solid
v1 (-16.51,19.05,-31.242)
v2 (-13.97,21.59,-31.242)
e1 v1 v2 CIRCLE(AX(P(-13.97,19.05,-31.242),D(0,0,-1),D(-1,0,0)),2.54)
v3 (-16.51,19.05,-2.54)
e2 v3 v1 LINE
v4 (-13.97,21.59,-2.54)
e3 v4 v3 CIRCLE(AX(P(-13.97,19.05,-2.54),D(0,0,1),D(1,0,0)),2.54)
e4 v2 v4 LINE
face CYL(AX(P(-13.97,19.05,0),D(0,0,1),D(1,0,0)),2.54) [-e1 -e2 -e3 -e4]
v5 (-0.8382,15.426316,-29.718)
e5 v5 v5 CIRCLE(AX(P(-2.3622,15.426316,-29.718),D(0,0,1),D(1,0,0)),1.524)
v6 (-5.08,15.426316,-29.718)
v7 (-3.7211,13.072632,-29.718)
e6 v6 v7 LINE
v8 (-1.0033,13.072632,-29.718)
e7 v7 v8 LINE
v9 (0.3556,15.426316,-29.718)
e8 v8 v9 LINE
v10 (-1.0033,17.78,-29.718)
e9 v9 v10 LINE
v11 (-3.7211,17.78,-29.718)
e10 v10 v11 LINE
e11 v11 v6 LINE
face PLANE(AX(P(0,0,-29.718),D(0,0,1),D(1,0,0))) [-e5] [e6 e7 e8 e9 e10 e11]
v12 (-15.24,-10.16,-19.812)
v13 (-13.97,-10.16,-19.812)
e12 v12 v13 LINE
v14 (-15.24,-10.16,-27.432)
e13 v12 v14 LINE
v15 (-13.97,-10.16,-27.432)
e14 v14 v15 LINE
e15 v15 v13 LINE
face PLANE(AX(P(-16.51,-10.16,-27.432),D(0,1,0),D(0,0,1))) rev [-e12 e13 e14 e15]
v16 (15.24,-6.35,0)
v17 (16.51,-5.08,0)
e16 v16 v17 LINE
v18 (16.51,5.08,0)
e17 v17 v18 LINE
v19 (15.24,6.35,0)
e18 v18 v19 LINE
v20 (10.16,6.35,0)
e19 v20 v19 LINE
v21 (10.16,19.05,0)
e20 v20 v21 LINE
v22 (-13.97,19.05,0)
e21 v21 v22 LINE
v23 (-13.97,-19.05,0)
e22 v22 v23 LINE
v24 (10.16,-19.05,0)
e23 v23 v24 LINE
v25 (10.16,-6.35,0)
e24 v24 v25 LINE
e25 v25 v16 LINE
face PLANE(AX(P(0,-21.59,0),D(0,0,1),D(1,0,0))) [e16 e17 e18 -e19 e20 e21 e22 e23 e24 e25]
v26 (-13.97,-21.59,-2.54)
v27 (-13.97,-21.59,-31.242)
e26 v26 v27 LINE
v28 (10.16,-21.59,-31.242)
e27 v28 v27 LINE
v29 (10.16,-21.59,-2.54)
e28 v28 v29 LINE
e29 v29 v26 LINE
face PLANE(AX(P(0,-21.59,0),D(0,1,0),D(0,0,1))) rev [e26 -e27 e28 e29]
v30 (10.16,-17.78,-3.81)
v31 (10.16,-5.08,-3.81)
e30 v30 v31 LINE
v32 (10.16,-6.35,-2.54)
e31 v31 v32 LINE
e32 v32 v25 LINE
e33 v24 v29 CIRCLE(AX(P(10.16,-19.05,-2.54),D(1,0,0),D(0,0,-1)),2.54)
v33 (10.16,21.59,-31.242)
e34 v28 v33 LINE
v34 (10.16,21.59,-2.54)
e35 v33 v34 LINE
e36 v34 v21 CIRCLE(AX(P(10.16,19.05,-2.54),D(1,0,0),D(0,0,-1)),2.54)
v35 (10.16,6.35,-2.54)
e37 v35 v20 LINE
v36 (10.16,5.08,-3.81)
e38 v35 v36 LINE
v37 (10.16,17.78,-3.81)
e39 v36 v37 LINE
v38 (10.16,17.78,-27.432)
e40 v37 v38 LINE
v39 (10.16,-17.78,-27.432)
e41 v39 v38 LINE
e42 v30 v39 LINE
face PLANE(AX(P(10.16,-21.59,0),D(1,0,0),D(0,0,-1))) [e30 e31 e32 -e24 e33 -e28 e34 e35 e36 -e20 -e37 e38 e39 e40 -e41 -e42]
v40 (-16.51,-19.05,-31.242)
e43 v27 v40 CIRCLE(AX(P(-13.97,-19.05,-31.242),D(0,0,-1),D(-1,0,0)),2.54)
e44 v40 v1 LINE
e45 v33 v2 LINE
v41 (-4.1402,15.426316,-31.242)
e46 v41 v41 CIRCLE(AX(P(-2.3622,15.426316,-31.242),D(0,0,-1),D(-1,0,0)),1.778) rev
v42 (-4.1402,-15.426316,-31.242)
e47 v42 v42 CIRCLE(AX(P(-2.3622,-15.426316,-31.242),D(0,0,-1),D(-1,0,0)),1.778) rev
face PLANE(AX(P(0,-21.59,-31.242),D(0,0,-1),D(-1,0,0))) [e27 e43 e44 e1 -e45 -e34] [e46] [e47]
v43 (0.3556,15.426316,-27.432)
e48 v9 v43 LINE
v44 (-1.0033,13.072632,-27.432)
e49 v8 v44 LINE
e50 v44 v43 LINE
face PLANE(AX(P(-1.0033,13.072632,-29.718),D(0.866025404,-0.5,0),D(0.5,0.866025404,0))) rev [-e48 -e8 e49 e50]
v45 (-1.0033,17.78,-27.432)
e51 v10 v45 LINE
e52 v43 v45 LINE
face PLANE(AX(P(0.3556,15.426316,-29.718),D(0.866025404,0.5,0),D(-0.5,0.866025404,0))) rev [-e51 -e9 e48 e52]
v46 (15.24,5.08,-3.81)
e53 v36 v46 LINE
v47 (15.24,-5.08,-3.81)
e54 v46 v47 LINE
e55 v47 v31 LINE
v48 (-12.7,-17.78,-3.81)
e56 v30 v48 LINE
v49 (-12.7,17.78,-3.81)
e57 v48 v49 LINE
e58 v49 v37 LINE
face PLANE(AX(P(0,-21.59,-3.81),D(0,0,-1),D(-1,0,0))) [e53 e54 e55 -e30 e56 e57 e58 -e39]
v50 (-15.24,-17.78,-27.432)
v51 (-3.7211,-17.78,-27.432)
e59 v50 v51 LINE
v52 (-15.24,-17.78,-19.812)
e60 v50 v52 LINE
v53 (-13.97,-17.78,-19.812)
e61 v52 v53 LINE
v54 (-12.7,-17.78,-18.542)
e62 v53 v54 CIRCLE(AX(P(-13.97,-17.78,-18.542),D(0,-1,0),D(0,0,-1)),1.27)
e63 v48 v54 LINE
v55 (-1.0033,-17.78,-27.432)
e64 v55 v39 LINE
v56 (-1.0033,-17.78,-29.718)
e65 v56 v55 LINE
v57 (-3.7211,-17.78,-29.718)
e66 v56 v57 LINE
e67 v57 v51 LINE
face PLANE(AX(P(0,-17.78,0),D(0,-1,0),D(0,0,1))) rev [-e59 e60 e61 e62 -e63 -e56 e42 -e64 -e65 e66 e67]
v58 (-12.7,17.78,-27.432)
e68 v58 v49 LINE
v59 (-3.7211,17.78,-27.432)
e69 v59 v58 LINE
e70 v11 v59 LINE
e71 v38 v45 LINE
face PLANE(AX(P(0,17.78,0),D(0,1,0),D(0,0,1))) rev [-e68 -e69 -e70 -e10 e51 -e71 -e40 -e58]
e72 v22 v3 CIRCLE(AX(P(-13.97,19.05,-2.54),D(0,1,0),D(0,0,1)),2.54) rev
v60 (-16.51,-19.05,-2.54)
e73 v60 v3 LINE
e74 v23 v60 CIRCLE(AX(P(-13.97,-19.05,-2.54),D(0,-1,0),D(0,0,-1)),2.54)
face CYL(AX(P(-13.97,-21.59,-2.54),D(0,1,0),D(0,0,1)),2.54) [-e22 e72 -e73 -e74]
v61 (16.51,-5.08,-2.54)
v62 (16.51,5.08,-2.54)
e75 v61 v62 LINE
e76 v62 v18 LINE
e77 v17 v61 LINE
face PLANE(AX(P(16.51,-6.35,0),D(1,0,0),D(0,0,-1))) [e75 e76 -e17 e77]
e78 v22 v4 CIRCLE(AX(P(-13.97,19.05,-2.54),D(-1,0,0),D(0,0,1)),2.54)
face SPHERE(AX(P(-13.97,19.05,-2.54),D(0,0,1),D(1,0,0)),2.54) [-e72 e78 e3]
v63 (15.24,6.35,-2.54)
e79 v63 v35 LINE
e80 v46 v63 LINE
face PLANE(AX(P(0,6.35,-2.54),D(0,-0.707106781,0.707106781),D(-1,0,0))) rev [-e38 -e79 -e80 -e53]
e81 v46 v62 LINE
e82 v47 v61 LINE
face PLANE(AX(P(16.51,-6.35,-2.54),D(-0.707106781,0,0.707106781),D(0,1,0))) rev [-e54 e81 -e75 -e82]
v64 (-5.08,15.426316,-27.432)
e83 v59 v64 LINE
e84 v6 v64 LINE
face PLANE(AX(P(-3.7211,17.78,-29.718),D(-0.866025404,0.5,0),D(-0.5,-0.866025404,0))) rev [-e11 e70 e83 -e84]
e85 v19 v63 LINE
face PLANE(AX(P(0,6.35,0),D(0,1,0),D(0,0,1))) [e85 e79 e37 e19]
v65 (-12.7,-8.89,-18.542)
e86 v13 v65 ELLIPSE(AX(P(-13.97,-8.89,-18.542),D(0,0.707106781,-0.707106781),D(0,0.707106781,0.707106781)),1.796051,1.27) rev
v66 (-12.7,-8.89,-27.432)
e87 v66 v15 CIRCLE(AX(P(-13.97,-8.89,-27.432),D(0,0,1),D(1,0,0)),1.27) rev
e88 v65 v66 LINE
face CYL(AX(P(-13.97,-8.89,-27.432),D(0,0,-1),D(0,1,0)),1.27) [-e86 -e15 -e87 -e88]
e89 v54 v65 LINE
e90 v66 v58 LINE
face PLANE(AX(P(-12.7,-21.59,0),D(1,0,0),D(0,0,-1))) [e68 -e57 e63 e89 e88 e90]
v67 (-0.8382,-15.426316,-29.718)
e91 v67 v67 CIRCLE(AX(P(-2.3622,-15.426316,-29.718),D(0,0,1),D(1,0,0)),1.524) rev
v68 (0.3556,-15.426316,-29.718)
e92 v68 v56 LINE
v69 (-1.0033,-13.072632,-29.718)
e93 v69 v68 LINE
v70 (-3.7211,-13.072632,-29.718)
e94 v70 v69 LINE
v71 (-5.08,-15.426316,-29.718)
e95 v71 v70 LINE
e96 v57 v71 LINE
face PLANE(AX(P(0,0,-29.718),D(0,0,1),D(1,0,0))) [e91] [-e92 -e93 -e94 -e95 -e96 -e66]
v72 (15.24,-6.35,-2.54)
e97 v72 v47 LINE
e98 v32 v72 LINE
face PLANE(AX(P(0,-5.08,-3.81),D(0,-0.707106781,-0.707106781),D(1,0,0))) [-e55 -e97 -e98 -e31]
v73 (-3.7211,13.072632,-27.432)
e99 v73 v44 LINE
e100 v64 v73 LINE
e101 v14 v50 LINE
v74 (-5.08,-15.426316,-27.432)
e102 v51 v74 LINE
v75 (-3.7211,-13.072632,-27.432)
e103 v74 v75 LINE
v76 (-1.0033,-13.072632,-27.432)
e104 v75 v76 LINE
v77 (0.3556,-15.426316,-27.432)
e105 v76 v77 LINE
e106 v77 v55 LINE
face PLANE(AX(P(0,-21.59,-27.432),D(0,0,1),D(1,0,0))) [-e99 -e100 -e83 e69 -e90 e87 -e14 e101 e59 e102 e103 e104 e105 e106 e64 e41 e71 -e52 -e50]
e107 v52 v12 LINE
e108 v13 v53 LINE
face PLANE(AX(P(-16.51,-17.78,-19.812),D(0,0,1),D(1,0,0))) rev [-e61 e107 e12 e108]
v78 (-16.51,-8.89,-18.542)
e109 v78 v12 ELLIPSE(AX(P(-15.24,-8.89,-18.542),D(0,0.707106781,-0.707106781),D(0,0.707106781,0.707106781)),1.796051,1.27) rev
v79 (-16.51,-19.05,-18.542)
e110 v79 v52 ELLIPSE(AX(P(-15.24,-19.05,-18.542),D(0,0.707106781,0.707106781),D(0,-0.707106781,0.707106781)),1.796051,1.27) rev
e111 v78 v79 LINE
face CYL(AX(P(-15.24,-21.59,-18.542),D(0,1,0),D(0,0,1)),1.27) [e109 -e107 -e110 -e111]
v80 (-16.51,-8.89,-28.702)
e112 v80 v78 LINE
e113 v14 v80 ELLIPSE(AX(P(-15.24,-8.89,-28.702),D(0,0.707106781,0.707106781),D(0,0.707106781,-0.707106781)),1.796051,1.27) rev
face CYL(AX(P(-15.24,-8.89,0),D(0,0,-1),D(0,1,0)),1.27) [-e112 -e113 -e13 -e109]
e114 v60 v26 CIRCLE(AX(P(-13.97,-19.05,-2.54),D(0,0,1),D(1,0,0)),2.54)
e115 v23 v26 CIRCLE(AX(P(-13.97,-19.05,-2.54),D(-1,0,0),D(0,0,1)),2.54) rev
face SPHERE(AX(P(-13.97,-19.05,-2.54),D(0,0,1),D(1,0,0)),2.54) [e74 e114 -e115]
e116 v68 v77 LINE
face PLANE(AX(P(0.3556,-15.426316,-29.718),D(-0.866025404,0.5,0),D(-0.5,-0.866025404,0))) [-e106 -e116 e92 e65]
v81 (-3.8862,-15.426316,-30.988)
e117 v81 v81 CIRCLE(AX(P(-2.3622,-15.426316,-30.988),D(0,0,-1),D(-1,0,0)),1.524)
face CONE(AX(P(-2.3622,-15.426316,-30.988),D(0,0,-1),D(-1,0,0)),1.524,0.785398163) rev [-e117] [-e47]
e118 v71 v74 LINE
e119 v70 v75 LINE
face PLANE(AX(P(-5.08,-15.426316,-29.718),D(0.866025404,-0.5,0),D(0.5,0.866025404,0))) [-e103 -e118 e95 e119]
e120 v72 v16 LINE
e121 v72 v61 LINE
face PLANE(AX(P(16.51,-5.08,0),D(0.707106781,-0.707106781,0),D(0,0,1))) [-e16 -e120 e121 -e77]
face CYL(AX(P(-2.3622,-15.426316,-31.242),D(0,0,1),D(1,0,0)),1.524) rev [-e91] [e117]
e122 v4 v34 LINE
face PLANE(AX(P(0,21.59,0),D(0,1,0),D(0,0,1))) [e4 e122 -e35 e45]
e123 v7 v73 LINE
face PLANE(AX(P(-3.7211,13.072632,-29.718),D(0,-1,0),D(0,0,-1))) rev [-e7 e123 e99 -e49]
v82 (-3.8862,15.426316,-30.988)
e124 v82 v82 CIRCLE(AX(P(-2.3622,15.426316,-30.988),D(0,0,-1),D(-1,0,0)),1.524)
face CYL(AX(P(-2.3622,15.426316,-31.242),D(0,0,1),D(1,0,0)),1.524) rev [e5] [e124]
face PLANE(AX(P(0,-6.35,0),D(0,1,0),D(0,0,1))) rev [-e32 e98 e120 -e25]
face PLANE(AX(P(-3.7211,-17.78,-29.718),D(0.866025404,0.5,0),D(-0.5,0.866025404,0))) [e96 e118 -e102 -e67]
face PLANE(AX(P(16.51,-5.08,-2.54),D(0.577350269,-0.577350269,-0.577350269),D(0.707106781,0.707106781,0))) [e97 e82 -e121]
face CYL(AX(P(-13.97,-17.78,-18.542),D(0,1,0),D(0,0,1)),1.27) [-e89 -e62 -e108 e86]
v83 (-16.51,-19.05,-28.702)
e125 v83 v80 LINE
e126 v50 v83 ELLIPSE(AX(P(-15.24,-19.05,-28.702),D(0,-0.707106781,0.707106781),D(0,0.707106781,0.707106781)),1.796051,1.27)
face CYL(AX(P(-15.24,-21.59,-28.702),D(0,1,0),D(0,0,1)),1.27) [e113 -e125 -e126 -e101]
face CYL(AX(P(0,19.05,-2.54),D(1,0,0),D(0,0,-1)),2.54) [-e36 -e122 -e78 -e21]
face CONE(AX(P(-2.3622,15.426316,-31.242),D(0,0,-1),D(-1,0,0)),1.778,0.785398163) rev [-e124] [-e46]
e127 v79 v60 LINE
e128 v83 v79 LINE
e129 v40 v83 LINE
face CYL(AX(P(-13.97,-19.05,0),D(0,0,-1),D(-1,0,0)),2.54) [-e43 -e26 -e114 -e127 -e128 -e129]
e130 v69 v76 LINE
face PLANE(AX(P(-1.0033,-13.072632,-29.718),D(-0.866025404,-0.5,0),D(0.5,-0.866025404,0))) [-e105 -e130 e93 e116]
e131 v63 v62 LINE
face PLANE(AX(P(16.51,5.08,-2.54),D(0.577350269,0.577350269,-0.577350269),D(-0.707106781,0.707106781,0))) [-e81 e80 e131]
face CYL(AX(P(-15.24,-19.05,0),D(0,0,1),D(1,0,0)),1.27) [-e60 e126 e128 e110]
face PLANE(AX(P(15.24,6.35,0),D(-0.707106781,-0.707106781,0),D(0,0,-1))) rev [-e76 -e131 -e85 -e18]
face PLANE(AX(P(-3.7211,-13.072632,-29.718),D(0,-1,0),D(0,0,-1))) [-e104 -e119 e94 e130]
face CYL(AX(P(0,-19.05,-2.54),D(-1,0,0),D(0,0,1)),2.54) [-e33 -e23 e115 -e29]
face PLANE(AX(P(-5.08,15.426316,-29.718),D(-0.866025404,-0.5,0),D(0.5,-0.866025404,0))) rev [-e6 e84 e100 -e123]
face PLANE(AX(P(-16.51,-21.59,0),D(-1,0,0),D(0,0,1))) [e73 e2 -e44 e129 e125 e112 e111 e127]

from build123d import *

# Parameters (mm, degrees)
BOSS_EXTRUDE1_DEPTH      = 21.59
BOSS_EXTRUDE1_DEPTH_BACK = 21.59
BOSS_EXTRUDE2_DEPTH      = 6.35
BOSS_EXTRUDE2_DEPTH_BACK = 6.35
SKETCH1_4_W              = 6.35
SKETCH1_4_H              = 3.81
SKETCH3_W                = 26.67
SKETCH3_H                = 31.242
BOSS_EXTRUDE3_DEPTH      = 3.81
SKETCH4_R                = 1.524
CUT_EXTRUDE1_DEPTH       = 2.286
SKETCH4_4_R              = 1.524
CUT_EXTRUDE3_DEPTH       = 39.616354359
SKETCH6_W                = 7.62
SKETCH6_H                = 7.62
CUT_EXTRUDE4_DEPTH       = 48.910486994
FILLET1_R                = 2.54
FILLET2_R                = 1.27
CHAMFER1_SIZE            = 1.27
CHAMFER2_SIZE            = 0.254


with BuildPart() as part:
    # Sketch1 → Boss-Extrude1 (new, two sides: drawn at the far end of the back side and taken through both)
    with BuildSketch(Plane(origin=(0, 0, 0), x_dir=(1, 0, 0), z_dir=(0, 1, 0)).offset(-BOSS_EXTRUDE1_DEPTH_BACK)):
        Polygon((-16.51, 31.242), (-16.51, 0), (10.16, 0), (10.16, 3.81), (-12.7, 3.81), (-12.7, 27.432), (10.16, 27.432), (10.16, 31.242), align=None)
    extrude(amount=BOSS_EXTRUDE1_DEPTH + BOSS_EXTRUDE1_DEPTH_BACK)

    # Sketch1<4> → Boss-Extrude2 (add, two sides: drawn at the far end of the back side and taken through both)
    with BuildSketch(Plane(origin=(0, 0, 0), x_dir=(1, 0, 0), z_dir=(0, 1, 0)).offset(-BOSS_EXTRUDE2_DEPTH_BACK)):
        with Locations((13.335, 1.905)):
            Rectangle(SKETCH1_4_W, SKETCH1_4_H)
    extrude(amount=BOSS_EXTRUDE2_DEPTH + BOSS_EXTRUDE2_DEPTH_BACK)

    # Sketch3 → Boss-Extrude3 (add)
    with BuildSketch(Plane(origin=(0, 21.59, 0), x_dir=(1, 0, 0), z_dir=(0, 1, 0))):
        with Locations((-3.175, 15.621)):
            Rectangle(SKETCH3_W, SKETCH3_H)
    boss_extrude3 = extrude(amount=-BOSS_EXTRUDE3_DEPTH)

    # Mirror1: Boss-Extrude3 across plane
    add(boss_extrude3.mirror(Plane.ZX))

    # Sketch4 → Cut-Extrude1 (cut)
    with BuildSketch(Plane.XY.offset(-27.432)):
        Polygon((0.3556, 15.426316158), (-1.0033, 17.78), (-3.7211, 17.78), (-5.08, 15.426316158), (-3.7211, 13.072632315), (-1.0033, 13.072632315), align=None)
        with Locations((-2.3622, 15.426316158)):
            Circle(SKETCH4_R, mode=Mode.SUBTRACT)
    cut_extrude1 = extrude(amount=-CUT_EXTRUDE1_DEPTH, mode=Mode.SUBTRACT)

    # Sketch4<4> → Cut-Extrude3 (cut, through all)
    with BuildSketch(Plane.XY.offset(-27.432)):
        with Locations((-2.3622, 15.426316158)):
            Circle(SKETCH4_4_R)
    cut_extrude3 = extrude(amount=-CUT_EXTRUDE3_DEPTH, mode=Mode.SUBTRACT)

    # Mirror2: Cut-Extrude1, Cut-Extrude3 across plane
    add(cut_extrude1.mirror(Plane.ZX), mode=Mode.SUBTRACT)
    add(cut_extrude3.mirror(Plane.ZX), mode=Mode.SUBTRACT)

    # Sketch6 → Cut-Extrude4 (cut, through all)
    with BuildSketch(Plane(origin=(-12.7, 0, 0), x_dir=(0, 0, -1), z_dir=(1, 0, 0))):
        with Locations((23.622, -13.97)):
            Rectangle(SKETCH6_W, SKETCH6_H)
    extrude(amount=-CUT_EXTRUDE4_DEPTH, mode=Mode.SUBTRACT)

    # Fillet1
    fillet1_edges = [part.edges().sort_by_distance(p)[0] for p in [
        (-16.51, 0, 0),
        (-16.51, 21.59, -15.621),
        (-3.175, 21.59, 0),
        (-16.51, -21.59, -15.621),
        (-3.175, -21.59, 0),
    ]]
    fillet(fillet1_edges, radius=FILLET1_R)

    # Fillet2
    fillet2_edges = [part.edges().sort_by_distance(p)[0] for p in [
        (-16.51, -13.97, -27.432),
        (-16.51, -17.78, -23.622),
        (-16.51, -13.97, -19.812),
        (-16.51, -10.16, -23.622),
        (-12.7, -10.16, -23.622),
        (-12.7, -13.97, -19.812),
    ]]
    fillet(fillet2_edges, radius=FILLET2_R - 0.0001)  # a hair under: the kernel refuses the full size

    # Chamfer1
    chamfer1_edges = [part.edges().sort_by_distance(p)[0] for p in [
        (13.335, -6.35, -3.81),
        (16.51, 0, -3.81),
        (16.51, -6.35, -1.905),
        (13.335, 6.35, -3.81),
        (16.51, 6.35, -1.905),
    ]]
    chamfer(chamfer1_edges, length=CHAMFER1_SIZE)

    # Chamfer2
    chamfer2_edges = [part.edges().sort_by_distance(p)[0] for p in [
        (-3.8862, 15.426316158, -31.242),
        (-3.8862, -15.426316158, -31.242),
    ]]
    chamfer(chamfer2_edges, length=CHAMFER2_SIZE)


solid = part.part
